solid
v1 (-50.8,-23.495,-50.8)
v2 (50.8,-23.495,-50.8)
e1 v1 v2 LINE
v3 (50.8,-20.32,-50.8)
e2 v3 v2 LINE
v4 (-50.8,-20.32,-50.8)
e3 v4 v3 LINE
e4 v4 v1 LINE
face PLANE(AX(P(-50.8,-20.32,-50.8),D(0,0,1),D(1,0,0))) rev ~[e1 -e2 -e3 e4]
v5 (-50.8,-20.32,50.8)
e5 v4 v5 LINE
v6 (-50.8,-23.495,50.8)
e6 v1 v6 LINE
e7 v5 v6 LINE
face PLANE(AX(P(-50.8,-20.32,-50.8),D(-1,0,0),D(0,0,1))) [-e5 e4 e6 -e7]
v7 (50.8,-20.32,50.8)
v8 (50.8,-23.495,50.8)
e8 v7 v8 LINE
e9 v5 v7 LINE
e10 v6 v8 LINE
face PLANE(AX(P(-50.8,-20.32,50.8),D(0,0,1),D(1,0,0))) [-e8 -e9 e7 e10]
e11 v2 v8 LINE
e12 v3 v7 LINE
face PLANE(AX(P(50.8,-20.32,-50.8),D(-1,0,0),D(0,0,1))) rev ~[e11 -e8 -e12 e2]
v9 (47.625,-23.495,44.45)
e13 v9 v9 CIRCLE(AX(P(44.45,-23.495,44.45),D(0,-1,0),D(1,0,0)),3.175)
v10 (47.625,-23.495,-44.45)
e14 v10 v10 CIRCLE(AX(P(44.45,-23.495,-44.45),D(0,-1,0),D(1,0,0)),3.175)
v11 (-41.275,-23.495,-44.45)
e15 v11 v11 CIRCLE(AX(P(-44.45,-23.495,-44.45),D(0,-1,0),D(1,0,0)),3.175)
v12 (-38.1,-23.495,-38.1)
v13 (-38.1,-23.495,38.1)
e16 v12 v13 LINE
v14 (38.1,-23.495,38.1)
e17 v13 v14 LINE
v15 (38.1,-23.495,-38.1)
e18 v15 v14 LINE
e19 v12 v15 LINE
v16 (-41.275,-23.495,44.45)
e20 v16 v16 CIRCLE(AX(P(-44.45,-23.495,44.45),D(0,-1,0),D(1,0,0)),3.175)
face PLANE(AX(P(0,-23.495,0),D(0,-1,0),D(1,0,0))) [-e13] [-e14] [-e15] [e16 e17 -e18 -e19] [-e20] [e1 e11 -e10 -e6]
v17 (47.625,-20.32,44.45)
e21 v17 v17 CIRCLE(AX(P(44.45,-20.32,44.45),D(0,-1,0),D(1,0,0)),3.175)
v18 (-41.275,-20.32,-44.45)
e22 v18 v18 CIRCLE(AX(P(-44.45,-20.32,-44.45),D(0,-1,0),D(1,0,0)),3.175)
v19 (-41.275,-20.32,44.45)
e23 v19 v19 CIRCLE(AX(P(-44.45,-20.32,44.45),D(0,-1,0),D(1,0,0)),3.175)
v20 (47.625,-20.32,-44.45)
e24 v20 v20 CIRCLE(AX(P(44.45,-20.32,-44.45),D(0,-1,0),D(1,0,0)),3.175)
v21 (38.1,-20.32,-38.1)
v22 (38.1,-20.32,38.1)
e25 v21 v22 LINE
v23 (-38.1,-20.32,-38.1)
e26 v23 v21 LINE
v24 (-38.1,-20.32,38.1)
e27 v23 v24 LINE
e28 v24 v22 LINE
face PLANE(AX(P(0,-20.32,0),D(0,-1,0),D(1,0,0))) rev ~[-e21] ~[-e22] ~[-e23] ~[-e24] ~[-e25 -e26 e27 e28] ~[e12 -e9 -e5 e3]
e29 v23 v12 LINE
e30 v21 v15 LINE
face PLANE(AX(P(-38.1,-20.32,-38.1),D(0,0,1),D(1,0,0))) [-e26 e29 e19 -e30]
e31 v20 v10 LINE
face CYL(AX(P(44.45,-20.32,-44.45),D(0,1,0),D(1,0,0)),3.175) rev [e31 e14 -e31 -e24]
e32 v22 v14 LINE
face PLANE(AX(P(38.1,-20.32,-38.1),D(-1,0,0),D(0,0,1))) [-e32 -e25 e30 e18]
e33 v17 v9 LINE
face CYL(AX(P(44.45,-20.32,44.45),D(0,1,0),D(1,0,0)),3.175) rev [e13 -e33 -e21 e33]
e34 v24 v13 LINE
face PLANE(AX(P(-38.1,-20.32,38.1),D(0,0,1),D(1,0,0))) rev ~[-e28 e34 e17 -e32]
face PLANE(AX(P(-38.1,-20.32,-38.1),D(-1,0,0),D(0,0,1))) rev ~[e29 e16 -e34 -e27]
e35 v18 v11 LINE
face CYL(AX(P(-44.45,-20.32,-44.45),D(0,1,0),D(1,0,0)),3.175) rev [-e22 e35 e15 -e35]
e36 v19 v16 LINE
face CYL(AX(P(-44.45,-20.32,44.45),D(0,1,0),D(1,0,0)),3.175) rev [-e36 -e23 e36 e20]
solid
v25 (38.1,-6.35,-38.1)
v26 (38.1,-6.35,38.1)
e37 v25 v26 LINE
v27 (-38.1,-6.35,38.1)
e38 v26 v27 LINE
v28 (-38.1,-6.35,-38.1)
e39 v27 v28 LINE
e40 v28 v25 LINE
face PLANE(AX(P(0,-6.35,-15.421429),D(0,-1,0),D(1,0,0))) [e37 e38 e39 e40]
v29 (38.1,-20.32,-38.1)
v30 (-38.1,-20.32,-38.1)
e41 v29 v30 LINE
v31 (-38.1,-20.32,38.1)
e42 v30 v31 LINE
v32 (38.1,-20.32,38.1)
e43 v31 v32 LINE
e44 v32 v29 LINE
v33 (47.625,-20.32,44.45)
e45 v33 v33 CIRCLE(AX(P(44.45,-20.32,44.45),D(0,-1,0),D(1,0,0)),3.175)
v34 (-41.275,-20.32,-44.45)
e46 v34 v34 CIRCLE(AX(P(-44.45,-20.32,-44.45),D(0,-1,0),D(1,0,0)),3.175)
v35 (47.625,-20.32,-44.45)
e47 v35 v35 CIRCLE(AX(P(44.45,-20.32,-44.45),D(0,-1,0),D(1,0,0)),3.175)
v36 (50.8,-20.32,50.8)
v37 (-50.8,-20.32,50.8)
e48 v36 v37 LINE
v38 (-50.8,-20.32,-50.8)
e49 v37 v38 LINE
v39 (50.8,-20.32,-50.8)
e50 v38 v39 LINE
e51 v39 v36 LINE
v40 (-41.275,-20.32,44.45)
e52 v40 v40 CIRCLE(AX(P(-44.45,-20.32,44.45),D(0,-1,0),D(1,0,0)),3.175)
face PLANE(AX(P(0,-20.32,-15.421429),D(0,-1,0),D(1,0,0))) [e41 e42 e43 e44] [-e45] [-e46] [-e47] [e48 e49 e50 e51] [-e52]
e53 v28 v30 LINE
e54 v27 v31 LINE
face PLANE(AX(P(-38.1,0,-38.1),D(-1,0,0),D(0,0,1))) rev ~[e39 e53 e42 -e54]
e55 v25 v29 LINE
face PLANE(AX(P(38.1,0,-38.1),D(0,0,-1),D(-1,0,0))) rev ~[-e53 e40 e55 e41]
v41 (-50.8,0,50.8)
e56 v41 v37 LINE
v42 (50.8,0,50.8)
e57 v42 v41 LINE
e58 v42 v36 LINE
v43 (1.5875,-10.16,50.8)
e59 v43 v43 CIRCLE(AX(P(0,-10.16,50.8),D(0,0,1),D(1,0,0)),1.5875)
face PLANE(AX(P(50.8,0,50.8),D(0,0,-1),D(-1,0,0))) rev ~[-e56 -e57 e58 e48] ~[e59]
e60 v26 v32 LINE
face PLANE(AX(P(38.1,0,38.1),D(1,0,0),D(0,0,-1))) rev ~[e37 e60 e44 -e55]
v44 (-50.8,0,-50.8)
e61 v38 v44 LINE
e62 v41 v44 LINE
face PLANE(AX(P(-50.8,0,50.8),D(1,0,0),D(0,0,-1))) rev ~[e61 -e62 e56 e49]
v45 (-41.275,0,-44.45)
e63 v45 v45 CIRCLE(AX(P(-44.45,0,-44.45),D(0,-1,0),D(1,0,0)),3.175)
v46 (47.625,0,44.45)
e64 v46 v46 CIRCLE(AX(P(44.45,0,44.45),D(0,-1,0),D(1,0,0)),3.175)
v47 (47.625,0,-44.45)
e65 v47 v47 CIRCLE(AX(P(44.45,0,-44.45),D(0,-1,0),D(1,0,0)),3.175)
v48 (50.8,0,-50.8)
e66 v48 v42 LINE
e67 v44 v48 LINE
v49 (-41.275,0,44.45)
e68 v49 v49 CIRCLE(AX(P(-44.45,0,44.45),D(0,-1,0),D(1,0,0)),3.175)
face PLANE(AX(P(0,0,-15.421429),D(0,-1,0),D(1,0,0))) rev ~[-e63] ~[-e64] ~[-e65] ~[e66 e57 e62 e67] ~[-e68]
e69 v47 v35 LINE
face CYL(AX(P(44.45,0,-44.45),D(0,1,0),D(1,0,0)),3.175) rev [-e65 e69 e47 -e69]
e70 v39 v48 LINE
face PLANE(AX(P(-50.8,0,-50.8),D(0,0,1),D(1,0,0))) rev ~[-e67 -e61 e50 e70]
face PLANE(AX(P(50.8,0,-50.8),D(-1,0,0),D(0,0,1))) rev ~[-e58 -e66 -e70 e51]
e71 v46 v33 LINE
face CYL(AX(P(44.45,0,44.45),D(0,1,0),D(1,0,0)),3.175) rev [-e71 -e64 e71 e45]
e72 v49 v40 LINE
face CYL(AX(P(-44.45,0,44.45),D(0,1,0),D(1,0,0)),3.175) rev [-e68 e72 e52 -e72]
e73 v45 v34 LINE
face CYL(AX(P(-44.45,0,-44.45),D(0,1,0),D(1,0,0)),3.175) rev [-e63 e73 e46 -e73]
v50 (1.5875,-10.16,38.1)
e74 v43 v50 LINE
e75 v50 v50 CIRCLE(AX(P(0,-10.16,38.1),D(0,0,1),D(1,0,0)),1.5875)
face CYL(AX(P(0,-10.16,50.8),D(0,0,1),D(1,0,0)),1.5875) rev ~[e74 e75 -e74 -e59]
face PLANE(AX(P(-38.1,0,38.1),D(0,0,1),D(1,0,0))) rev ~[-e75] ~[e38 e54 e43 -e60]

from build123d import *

# Parameters (mm, degrees)
F0_R     = 3.175
F0_W     = 12.7
F0_H     = 12.7
F1_DEPTH = 6.35
F2_DEPTH = 20.32
F3_R     = 1.5875
F4_DEPTH = 25.4
F5_W     = 101.6
F5_H     = 101.6
F5_R     = 3.175
F5_W_2   = 76.2
F5_H_2   = 76.2
F6_DEPTH = 3.175


# Not quite as in the source:
# - a feature names something its author has since deleted; it is built from what else it names


with BuildPart() as f1:
    # F0 (on Front) → F1 (new body)
    with BuildSketch(Plane.XZ):
        Polygon((38.1, 38.1), (38.1, 0), (38.1, -38.1), (-38.1, -38.1), (-38.1, 0), (-38.1, 38.1), (-50.8, 38.1), (-50.8, -50.8), (50.8, -50.8), (50.8, 38.1), align=None)
        with Locations((-44.45, -44.45)):
            Circle(F0_R, mode=Mode.SUBTRACT)
        with Locations((44.45, -44.45)):
            Circle(F0_R, mode=Mode.SUBTRACT)
        Polygon((38.1, -38.1), (38.1, 0), (38.1, 38.1), (0, 38.1), (-38.1, 38.1), (-38.1, 0), (-38.1, -38.1), align=None)
        Polygon((0, 38.1), (38.1, 38.1), (38.1, 50.8), (-38.1, 50.8), (-38.1, 38.1), align=None)
        with Locations((-44.45, 44.45)):
            Rectangle(F0_W, F0_H)
        with Locations((-44.45, 44.45)):
            Circle(F0_R, mode=Mode.SUBTRACT)
        with Locations((44.45, 44.45)):
            Rectangle(F0_W, F0_H)
        with Locations((44.45, 44.45)):
            Circle(F0_R, mode=Mode.SUBTRACT)
    extrude(amount=F1_DEPTH)

    # F0 (on Front) → F2 (join)
    with BuildSketch(Plane.XZ):
        Polygon((38.1, 38.1), (38.1, 0), (38.1, -38.1), (-38.1, -38.1), (-38.1, 0), (-38.1, 38.1), (-50.8, 38.1), (-50.8, -50.8), (50.8, -50.8), (50.8, 38.1), align=None)
        with Locations((-44.45, -44.45)):
            Circle(F0_R, mode=Mode.SUBTRACT)
        with Locations((44.45, -44.45)):
            Circle(F0_R, mode=Mode.SUBTRACT)
        Polygon((0, 38.1), (38.1, 38.1), (38.1, 50.8), (-38.1, 50.8), (-38.1, 38.1), align=None)
        with Locations((44.45, 44.45)):
            Rectangle(F0_W, F0_H)
        with Locations((44.45, 44.45)):
            Circle(F0_R, mode=Mode.SUBTRACT)
        with Locations((-44.45, 44.45)):
            Rectangle(F0_W, F0_H)
        with Locations((-44.45, 44.45)):
            Circle(F0_R, mode=Mode.SUBTRACT)
    extrude(amount=F2_DEPTH)

    # F3 (on face) → F4 (cut)
    with BuildSketch(Plane.XY.offset(50.8)):
        with Locations((0, -10.16)):
            Circle(F3_R)
    extrude(amount=-F4_DEPTH, mode=Mode.SUBTRACT)


with BuildPart() as f6:
    # F5 (on face) → F6 (new body)
    with BuildSketch(Plane.XZ.offset(20.32)):
        Rectangle(F5_W, F5_H)
        with Locations((-44.45, -44.45)):
            Circle(F5_R, mode=Mode.SUBTRACT)
        Rectangle(F5_W_2, F5_H_2, mode=Mode.SUBTRACT)
        with Locations((44.45, -44.45)):
            Circle(F5_R, mode=Mode.SUBTRACT)
        with Locations((-44.45, 44.45)):
            Circle(F5_R, mode=Mode.SUBTRACT)
        with Locations((44.45, 44.45)):
            Circle(F5_R, mode=Mode.SUBTRACT)
    extrude(amount=F6_DEPTH)


solid = Compound([f1.part, f6.part])
